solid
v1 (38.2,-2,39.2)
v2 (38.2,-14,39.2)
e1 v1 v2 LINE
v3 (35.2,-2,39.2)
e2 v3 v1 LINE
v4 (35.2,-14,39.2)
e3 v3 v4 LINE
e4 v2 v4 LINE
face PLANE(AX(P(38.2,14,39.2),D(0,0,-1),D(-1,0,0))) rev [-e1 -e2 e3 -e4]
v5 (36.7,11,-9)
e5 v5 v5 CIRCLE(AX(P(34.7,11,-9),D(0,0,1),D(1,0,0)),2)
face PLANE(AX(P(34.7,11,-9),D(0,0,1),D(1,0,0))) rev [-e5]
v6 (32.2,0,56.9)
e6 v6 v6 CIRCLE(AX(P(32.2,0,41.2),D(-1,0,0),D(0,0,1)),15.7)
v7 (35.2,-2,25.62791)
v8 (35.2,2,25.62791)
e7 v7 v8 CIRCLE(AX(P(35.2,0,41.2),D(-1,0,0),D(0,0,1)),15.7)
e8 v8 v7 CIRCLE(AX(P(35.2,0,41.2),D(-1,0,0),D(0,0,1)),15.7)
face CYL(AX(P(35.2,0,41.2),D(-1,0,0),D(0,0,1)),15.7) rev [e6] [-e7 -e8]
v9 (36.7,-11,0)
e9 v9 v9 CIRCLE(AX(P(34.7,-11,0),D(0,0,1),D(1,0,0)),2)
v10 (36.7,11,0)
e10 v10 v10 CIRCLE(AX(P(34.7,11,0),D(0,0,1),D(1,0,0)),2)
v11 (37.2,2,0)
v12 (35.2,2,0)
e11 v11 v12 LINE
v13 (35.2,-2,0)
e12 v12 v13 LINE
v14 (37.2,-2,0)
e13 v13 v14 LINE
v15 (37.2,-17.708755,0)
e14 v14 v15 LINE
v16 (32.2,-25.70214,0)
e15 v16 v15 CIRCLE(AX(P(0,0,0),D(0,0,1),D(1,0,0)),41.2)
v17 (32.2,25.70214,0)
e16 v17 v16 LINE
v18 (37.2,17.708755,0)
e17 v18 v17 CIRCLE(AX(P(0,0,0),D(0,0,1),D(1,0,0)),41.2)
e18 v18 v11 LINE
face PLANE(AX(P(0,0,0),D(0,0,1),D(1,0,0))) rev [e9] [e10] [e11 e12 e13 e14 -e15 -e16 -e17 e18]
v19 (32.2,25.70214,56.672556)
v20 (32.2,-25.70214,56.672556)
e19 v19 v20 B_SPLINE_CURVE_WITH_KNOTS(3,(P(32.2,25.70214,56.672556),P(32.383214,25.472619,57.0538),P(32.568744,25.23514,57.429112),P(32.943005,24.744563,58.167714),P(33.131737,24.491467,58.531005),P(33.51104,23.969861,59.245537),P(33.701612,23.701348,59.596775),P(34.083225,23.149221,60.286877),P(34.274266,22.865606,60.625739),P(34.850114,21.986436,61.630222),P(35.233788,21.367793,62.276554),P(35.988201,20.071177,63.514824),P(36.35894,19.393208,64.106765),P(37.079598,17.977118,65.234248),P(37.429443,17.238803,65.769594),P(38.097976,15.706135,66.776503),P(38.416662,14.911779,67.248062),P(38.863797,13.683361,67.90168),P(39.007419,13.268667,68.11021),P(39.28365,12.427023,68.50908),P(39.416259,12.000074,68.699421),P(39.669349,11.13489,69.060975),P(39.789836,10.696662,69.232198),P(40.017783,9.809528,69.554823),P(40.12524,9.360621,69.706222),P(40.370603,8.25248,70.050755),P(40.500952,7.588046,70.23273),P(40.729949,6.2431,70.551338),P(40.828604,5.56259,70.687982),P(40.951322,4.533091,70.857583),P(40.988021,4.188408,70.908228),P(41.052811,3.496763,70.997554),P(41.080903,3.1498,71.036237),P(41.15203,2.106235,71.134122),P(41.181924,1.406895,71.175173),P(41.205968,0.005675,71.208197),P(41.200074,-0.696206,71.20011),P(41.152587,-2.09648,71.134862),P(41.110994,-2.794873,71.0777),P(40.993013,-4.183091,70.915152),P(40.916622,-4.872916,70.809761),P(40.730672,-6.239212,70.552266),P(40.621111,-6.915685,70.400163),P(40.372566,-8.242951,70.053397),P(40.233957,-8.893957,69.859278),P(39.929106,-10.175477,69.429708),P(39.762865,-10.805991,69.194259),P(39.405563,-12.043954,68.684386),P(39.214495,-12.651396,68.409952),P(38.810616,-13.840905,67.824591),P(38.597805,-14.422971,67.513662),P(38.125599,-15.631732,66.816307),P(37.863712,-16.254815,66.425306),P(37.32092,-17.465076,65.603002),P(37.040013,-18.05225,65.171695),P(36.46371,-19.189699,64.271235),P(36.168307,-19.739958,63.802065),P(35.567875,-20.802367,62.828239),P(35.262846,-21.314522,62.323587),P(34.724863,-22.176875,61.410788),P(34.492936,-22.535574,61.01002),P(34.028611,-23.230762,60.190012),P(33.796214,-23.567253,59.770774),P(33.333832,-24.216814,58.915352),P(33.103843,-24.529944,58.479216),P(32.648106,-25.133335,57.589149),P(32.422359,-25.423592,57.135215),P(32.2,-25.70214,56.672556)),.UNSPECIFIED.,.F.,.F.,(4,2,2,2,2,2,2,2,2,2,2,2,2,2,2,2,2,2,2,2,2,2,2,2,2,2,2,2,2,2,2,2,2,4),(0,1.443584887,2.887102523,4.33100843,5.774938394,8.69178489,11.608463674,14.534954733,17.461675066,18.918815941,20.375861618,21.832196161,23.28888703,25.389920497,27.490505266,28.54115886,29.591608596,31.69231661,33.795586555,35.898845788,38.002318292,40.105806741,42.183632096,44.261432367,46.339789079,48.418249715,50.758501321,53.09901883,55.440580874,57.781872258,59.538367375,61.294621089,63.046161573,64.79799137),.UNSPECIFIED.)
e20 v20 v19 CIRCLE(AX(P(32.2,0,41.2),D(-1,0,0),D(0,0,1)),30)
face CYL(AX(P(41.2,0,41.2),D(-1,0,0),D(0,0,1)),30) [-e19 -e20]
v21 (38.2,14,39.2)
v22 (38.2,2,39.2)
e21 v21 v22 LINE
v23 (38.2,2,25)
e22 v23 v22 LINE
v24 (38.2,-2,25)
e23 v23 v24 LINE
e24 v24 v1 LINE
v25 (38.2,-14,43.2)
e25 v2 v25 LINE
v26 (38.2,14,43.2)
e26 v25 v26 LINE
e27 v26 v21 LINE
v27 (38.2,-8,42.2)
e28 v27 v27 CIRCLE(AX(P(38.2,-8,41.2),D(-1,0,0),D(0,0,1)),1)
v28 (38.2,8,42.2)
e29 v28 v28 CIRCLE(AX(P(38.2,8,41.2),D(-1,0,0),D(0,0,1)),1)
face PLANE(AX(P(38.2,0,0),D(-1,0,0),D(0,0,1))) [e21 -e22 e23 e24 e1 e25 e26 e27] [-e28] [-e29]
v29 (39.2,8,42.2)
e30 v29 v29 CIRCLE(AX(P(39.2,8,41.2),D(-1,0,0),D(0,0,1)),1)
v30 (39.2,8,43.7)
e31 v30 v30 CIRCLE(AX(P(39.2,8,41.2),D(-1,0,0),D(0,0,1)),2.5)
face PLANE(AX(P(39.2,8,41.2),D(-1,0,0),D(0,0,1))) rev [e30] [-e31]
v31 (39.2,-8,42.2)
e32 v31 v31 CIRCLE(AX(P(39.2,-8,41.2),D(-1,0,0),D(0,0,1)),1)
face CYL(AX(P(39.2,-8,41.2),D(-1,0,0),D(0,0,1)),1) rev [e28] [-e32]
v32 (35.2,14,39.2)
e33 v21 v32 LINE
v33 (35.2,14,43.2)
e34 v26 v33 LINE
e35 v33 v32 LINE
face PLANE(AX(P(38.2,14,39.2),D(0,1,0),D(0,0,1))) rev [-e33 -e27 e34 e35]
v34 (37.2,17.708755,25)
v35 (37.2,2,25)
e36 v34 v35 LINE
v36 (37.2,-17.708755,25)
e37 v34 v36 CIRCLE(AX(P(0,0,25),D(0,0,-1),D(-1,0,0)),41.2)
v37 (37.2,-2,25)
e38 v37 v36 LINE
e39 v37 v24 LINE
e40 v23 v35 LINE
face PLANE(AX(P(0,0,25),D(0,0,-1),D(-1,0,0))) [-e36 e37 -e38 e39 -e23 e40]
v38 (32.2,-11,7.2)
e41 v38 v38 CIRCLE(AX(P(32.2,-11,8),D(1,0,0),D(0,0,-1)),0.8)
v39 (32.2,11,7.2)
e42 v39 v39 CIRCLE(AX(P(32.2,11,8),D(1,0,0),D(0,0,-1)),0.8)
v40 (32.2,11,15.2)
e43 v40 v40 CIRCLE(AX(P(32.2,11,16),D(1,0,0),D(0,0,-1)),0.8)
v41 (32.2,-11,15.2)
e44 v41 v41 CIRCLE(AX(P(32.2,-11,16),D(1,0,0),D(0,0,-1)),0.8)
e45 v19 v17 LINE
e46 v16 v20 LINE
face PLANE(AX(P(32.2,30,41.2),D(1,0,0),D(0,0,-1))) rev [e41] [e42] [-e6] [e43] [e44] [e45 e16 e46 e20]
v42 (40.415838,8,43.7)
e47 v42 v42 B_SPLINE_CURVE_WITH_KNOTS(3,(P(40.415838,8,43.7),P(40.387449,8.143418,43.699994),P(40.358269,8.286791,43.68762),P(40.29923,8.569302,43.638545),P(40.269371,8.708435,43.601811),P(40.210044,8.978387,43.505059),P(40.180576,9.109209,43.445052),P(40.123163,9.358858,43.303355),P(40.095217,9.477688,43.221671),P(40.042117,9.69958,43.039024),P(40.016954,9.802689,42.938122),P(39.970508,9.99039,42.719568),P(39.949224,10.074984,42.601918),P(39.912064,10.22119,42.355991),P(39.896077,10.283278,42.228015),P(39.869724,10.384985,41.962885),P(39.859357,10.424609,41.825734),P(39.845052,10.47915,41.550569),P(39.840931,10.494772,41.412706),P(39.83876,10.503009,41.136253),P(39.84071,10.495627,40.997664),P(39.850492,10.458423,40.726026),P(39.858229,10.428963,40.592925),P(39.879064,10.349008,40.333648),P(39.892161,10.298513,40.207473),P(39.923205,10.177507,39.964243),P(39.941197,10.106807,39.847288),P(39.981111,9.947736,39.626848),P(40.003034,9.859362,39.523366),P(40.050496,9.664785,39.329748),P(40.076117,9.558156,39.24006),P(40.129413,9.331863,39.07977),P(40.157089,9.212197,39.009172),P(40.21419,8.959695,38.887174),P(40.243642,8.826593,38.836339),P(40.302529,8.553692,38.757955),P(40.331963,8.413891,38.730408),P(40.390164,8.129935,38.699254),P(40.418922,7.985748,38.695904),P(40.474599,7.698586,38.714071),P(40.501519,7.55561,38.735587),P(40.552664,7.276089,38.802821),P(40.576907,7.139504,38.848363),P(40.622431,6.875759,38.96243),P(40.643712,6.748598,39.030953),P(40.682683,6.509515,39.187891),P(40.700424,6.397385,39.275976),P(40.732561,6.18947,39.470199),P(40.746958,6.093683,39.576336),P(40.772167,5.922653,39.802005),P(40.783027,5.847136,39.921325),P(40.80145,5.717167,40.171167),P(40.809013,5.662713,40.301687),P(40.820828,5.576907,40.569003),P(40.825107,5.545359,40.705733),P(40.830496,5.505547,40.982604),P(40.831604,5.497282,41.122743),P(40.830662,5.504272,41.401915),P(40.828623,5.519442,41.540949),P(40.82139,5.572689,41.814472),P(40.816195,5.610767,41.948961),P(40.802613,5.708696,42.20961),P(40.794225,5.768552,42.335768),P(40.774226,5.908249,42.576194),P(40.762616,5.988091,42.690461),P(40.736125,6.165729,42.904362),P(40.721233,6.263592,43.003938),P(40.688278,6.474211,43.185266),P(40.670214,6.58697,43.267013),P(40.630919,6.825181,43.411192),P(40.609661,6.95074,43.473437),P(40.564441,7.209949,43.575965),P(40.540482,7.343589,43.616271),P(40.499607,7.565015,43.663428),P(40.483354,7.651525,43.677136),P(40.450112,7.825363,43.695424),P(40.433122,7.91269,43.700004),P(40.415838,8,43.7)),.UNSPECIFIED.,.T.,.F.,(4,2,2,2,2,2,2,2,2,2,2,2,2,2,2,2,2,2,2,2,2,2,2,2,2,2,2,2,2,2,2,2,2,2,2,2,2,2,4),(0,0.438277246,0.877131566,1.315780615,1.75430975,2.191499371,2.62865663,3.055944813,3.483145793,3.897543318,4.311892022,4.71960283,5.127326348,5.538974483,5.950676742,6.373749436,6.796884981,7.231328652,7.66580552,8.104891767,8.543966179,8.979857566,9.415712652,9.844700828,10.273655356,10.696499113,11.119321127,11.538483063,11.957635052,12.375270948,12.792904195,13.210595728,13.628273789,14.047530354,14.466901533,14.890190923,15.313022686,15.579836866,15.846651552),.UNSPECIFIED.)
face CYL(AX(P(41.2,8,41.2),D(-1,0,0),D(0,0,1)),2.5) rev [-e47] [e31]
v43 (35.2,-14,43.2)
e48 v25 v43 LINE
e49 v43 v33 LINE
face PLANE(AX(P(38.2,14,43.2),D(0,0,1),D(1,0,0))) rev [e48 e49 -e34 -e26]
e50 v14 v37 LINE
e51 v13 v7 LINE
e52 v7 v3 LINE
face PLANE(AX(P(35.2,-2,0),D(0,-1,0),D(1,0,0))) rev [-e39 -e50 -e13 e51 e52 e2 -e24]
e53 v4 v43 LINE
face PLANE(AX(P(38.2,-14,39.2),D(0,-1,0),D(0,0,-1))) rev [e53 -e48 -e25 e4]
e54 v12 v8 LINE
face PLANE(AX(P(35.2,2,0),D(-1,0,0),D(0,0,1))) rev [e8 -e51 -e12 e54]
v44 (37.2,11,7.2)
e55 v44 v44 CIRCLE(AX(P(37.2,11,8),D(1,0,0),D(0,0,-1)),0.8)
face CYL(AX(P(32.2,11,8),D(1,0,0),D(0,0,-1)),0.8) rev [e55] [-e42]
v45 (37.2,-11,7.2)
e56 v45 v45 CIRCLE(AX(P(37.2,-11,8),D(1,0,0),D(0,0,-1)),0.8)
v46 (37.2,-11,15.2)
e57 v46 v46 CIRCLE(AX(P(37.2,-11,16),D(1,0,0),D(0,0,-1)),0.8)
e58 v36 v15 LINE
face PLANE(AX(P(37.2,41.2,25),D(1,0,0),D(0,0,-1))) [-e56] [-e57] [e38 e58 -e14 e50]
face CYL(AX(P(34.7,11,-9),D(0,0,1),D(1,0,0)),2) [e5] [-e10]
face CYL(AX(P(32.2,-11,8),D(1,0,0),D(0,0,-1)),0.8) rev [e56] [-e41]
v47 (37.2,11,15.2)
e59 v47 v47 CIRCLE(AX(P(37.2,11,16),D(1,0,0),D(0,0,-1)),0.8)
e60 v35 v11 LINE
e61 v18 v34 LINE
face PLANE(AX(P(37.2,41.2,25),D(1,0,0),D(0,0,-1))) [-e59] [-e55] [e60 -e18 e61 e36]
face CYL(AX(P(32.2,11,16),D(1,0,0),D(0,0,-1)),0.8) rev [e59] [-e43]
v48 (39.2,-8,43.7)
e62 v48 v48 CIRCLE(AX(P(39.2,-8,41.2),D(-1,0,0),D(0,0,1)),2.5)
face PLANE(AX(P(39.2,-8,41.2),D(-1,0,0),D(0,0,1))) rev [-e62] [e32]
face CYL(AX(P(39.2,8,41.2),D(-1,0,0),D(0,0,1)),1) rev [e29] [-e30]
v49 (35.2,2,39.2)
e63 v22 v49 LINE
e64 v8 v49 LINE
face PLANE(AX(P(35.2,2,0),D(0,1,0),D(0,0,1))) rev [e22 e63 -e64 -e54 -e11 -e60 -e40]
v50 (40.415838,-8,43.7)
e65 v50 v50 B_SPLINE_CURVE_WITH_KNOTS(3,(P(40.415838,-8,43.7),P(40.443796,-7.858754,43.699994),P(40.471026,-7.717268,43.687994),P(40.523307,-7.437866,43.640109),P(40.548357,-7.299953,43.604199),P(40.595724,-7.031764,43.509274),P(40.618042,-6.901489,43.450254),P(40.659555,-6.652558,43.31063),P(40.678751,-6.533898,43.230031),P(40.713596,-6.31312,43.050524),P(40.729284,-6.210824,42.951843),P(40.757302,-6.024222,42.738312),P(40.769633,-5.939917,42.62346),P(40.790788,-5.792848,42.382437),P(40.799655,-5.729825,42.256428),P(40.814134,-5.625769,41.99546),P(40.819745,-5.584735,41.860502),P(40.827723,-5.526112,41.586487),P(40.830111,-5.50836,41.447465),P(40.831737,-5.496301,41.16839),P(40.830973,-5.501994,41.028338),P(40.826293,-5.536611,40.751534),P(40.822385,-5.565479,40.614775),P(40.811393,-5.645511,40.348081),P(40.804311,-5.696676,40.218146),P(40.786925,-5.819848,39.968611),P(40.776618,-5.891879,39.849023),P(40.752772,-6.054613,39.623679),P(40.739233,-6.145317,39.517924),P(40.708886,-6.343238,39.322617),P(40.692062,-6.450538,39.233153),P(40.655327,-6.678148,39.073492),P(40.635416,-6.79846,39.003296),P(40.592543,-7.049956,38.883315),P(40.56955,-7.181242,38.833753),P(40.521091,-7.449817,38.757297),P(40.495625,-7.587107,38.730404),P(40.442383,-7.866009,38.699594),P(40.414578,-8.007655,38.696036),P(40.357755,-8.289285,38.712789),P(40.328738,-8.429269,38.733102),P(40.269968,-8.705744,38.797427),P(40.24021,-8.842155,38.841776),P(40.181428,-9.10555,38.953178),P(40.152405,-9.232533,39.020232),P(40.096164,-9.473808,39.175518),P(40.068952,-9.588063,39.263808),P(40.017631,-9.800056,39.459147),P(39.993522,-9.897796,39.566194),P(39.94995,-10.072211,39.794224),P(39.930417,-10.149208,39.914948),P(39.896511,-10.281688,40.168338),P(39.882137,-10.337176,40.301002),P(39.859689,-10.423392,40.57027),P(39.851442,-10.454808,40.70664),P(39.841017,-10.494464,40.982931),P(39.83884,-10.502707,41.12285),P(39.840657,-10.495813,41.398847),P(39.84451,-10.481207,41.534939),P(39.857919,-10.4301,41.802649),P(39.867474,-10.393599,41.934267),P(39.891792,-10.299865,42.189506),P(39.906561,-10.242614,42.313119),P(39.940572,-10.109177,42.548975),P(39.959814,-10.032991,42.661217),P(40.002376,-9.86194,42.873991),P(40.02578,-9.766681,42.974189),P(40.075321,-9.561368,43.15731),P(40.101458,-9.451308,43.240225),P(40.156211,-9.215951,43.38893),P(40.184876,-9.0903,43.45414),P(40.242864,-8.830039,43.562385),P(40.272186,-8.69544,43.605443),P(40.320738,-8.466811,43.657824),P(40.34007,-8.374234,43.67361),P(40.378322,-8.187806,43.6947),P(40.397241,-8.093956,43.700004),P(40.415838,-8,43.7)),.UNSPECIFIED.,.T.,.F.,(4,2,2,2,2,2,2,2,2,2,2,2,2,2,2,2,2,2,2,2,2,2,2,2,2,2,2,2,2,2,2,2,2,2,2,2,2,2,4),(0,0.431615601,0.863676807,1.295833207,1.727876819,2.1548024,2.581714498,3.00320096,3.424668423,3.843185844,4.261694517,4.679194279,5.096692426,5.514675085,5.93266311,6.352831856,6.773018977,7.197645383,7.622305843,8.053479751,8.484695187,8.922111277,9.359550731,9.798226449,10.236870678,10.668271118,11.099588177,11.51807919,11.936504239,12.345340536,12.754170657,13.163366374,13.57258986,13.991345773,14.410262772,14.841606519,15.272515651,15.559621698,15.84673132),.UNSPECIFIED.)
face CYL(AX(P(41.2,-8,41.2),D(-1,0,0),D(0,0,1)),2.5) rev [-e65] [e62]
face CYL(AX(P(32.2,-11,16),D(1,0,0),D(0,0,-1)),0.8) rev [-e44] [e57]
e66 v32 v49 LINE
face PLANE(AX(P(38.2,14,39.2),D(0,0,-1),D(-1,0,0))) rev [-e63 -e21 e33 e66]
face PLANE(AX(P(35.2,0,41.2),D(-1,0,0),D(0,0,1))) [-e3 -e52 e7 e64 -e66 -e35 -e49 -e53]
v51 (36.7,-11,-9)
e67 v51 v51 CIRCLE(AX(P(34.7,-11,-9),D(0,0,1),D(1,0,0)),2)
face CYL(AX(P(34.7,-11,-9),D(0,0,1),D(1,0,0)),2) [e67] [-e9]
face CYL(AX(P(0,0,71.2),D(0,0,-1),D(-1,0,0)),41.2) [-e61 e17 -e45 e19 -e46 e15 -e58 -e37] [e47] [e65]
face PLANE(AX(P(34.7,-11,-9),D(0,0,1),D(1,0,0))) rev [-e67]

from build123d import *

# Parameters (mm, degrees)
SKETCH_1_W          = 9
SKETCH_1_H          = 60
EXTRUDE_1_DEPTH     = 41.2
SKETCH_4_R          = 30
EXTRUDE_3_DEPTH     = 9
CUT_EXTRUDE_1_DEPTH = 72
SKETCH_5_R          = 15.7
CUT_EXTRUDE_2_DEPTH = 3
SKETCH_6_W          = 4
SKETCH_6_H          = 28
CUT_EXTRUDE_3_DEPTH = 3
SKETCH_7_W          = 3
SKETCH_7_H          = 4
CUT_EXTRUDE_4_DEPTH = 39.2
SKETCH_8_W          = 4
SKETCH_8_H          = 82.4
CUT_EXTRUDE_5_DEPTH = 25
SKETCH_9_R          = 2
EXTRUDE_4_DEPTH     = 9
SKETCH_10_R         = 0.8
CUT_EXTRUDE_6_DEPTH = 5
SKETCH_11_R         = 1
CUT_EXTRUDE_7_DEPTH = 1
SKETCH_12_R         = 2.5
CUT_EXTRUDE_9_DEPTH = 2


with BuildPart() as part:
    # 草图1 → 凸台-拉伸1 (new body)
    with BuildSketch(Plane.XY):
        with Locations((36.7, 0)):
            Rectangle(SKETCH_1_W, SKETCH_1_H)
    extrude(amount=EXTRUDE_1_DEPTH)

    # 草图4 → 凸台-拉伸3 (add)
    with BuildSketch(Plane.ZY.offset(-32.2)):
        with Locations((41.2, 0)):
            Circle(SKETCH_4_R)
    extrude(amount=-EXTRUDE_3_DEPTH)

    # 切除-拉伸1: read off the stored shape, not the designer's step
    # 切除-拉伸1 outline → 切除-拉伸1 (cut)
    with BuildSketch(Plane.XY):
        with BuildLine():
            Line((32.2, 30), (32.2, 25.702139989))
            ThreePointArc((32.2, 25.702139989), (38.884958532, 13.616166862), (41.2, 0))
            Line((41.2, 0), (41.2, 30))
            Line((41.2, 30), (32.2, 30))
        make_face()
        with BuildLine():
            Line((41.2, -30), (41.2, 0))
            ThreePointArc((41.2, 0), (38.884958532, -13.616166862), (32.2, -25.702139989))
            Line((32.2, -25.702139989), (32.2, -30))
            Line((32.2, -30), (41.2, -30))
        make_face()
    extrude(amount=CUT_EXTRUDE_1_DEPTH, mode=Mode.SUBTRACT)

    # 草图5 → 切除-拉伸2 (cut)
    with BuildSketch(Plane.ZY.offset(-32.2)):
        with Locations((41.2, 0)):
            Circle(SKETCH_5_R)
    extrude(amount=-CUT_EXTRUDE_2_DEPTH, mode=Mode.SUBTRACT)

    # 草图6 → 切除-拉伸3 (cut)
    with BuildSketch(Plane.ZY.offset(-35.2)):
        with Locations((41.2, 0)):
            Rectangle(SKETCH_6_W, SKETCH_6_H)
    extrude(amount=-CUT_EXTRUDE_3_DEPTH, mode=Mode.SUBTRACT)

    # 草图7 → 切除-拉伸4 (cut)
    with BuildSketch(Plane.XY.offset(39.2)):
        with Locations((36.7, 0)):
            Rectangle(SKETCH_7_W, SKETCH_7_H)
    extrude(amount=-CUT_EXTRUDE_4_DEPTH, mode=Mode.SUBTRACT)

    # 草图8 → 切除-拉伸5 (cut)
    with BuildSketch(Plane.XY):
        with Locations((39.2, 0)):
            Rectangle(SKETCH_8_W, SKETCH_8_H)
    extrude(amount=CUT_EXTRUDE_5_DEPTH, mode=Mode.SUBTRACT)

    # 草图9 → 凸台-拉伸4 (add)
    with BuildSketch(Plane.XY):
        with Locations((34.7, 11)):
            Circle(SKETCH_9_R)
        with Locations((34.7, -11)):
            Circle(SKETCH_9_R)
    extrude(amount=-EXTRUDE_4_DEPTH)

    # 草图10 → 切除-拉伸6 (cut)
    with BuildSketch(Plane(origin=(37.2, 0, 0), x_dir=(0, 0, -1), z_dir=(1, 0, 0))):
        with Locations((-16, -11)):
            Circle(SKETCH_10_R)
        with Locations((-8, -11)):
            Circle(SKETCH_10_R)
        with Locations((-16, 11)):
            Circle(SKETCH_10_R)
        with Locations((-8, 11)):
            Circle(SKETCH_10_R)
    extrude(amount=-CUT_EXTRUDE_6_DEPTH, mode=Mode.SUBTRACT)

    # 草图11 → 切除-拉伸7 (cut)
    with BuildSketch(Plane.ZY.offset(-38.2)):
        with Locations((41.2, 8)):
            Circle(SKETCH_11_R)
        with Locations((41.2, -8)):
            Circle(SKETCH_11_R)
    extrude(amount=-CUT_EXTRUDE_7_DEPTH, mode=Mode.SUBTRACT)

    # 草图12 → 切除-拉伸9 (cut)
    with BuildSketch(Plane.ZY.offset(-39.2)):
        with Locations((41.2, 8)):
            Circle(SKETCH_12_R)
        with Locations((41.2, -8)):
            Circle(SKETCH_12_R)
    extrude(amount=-CUT_EXTRUDE_9_DEPTH, mode=Mode.SUBTRACT)


solid = part.part
